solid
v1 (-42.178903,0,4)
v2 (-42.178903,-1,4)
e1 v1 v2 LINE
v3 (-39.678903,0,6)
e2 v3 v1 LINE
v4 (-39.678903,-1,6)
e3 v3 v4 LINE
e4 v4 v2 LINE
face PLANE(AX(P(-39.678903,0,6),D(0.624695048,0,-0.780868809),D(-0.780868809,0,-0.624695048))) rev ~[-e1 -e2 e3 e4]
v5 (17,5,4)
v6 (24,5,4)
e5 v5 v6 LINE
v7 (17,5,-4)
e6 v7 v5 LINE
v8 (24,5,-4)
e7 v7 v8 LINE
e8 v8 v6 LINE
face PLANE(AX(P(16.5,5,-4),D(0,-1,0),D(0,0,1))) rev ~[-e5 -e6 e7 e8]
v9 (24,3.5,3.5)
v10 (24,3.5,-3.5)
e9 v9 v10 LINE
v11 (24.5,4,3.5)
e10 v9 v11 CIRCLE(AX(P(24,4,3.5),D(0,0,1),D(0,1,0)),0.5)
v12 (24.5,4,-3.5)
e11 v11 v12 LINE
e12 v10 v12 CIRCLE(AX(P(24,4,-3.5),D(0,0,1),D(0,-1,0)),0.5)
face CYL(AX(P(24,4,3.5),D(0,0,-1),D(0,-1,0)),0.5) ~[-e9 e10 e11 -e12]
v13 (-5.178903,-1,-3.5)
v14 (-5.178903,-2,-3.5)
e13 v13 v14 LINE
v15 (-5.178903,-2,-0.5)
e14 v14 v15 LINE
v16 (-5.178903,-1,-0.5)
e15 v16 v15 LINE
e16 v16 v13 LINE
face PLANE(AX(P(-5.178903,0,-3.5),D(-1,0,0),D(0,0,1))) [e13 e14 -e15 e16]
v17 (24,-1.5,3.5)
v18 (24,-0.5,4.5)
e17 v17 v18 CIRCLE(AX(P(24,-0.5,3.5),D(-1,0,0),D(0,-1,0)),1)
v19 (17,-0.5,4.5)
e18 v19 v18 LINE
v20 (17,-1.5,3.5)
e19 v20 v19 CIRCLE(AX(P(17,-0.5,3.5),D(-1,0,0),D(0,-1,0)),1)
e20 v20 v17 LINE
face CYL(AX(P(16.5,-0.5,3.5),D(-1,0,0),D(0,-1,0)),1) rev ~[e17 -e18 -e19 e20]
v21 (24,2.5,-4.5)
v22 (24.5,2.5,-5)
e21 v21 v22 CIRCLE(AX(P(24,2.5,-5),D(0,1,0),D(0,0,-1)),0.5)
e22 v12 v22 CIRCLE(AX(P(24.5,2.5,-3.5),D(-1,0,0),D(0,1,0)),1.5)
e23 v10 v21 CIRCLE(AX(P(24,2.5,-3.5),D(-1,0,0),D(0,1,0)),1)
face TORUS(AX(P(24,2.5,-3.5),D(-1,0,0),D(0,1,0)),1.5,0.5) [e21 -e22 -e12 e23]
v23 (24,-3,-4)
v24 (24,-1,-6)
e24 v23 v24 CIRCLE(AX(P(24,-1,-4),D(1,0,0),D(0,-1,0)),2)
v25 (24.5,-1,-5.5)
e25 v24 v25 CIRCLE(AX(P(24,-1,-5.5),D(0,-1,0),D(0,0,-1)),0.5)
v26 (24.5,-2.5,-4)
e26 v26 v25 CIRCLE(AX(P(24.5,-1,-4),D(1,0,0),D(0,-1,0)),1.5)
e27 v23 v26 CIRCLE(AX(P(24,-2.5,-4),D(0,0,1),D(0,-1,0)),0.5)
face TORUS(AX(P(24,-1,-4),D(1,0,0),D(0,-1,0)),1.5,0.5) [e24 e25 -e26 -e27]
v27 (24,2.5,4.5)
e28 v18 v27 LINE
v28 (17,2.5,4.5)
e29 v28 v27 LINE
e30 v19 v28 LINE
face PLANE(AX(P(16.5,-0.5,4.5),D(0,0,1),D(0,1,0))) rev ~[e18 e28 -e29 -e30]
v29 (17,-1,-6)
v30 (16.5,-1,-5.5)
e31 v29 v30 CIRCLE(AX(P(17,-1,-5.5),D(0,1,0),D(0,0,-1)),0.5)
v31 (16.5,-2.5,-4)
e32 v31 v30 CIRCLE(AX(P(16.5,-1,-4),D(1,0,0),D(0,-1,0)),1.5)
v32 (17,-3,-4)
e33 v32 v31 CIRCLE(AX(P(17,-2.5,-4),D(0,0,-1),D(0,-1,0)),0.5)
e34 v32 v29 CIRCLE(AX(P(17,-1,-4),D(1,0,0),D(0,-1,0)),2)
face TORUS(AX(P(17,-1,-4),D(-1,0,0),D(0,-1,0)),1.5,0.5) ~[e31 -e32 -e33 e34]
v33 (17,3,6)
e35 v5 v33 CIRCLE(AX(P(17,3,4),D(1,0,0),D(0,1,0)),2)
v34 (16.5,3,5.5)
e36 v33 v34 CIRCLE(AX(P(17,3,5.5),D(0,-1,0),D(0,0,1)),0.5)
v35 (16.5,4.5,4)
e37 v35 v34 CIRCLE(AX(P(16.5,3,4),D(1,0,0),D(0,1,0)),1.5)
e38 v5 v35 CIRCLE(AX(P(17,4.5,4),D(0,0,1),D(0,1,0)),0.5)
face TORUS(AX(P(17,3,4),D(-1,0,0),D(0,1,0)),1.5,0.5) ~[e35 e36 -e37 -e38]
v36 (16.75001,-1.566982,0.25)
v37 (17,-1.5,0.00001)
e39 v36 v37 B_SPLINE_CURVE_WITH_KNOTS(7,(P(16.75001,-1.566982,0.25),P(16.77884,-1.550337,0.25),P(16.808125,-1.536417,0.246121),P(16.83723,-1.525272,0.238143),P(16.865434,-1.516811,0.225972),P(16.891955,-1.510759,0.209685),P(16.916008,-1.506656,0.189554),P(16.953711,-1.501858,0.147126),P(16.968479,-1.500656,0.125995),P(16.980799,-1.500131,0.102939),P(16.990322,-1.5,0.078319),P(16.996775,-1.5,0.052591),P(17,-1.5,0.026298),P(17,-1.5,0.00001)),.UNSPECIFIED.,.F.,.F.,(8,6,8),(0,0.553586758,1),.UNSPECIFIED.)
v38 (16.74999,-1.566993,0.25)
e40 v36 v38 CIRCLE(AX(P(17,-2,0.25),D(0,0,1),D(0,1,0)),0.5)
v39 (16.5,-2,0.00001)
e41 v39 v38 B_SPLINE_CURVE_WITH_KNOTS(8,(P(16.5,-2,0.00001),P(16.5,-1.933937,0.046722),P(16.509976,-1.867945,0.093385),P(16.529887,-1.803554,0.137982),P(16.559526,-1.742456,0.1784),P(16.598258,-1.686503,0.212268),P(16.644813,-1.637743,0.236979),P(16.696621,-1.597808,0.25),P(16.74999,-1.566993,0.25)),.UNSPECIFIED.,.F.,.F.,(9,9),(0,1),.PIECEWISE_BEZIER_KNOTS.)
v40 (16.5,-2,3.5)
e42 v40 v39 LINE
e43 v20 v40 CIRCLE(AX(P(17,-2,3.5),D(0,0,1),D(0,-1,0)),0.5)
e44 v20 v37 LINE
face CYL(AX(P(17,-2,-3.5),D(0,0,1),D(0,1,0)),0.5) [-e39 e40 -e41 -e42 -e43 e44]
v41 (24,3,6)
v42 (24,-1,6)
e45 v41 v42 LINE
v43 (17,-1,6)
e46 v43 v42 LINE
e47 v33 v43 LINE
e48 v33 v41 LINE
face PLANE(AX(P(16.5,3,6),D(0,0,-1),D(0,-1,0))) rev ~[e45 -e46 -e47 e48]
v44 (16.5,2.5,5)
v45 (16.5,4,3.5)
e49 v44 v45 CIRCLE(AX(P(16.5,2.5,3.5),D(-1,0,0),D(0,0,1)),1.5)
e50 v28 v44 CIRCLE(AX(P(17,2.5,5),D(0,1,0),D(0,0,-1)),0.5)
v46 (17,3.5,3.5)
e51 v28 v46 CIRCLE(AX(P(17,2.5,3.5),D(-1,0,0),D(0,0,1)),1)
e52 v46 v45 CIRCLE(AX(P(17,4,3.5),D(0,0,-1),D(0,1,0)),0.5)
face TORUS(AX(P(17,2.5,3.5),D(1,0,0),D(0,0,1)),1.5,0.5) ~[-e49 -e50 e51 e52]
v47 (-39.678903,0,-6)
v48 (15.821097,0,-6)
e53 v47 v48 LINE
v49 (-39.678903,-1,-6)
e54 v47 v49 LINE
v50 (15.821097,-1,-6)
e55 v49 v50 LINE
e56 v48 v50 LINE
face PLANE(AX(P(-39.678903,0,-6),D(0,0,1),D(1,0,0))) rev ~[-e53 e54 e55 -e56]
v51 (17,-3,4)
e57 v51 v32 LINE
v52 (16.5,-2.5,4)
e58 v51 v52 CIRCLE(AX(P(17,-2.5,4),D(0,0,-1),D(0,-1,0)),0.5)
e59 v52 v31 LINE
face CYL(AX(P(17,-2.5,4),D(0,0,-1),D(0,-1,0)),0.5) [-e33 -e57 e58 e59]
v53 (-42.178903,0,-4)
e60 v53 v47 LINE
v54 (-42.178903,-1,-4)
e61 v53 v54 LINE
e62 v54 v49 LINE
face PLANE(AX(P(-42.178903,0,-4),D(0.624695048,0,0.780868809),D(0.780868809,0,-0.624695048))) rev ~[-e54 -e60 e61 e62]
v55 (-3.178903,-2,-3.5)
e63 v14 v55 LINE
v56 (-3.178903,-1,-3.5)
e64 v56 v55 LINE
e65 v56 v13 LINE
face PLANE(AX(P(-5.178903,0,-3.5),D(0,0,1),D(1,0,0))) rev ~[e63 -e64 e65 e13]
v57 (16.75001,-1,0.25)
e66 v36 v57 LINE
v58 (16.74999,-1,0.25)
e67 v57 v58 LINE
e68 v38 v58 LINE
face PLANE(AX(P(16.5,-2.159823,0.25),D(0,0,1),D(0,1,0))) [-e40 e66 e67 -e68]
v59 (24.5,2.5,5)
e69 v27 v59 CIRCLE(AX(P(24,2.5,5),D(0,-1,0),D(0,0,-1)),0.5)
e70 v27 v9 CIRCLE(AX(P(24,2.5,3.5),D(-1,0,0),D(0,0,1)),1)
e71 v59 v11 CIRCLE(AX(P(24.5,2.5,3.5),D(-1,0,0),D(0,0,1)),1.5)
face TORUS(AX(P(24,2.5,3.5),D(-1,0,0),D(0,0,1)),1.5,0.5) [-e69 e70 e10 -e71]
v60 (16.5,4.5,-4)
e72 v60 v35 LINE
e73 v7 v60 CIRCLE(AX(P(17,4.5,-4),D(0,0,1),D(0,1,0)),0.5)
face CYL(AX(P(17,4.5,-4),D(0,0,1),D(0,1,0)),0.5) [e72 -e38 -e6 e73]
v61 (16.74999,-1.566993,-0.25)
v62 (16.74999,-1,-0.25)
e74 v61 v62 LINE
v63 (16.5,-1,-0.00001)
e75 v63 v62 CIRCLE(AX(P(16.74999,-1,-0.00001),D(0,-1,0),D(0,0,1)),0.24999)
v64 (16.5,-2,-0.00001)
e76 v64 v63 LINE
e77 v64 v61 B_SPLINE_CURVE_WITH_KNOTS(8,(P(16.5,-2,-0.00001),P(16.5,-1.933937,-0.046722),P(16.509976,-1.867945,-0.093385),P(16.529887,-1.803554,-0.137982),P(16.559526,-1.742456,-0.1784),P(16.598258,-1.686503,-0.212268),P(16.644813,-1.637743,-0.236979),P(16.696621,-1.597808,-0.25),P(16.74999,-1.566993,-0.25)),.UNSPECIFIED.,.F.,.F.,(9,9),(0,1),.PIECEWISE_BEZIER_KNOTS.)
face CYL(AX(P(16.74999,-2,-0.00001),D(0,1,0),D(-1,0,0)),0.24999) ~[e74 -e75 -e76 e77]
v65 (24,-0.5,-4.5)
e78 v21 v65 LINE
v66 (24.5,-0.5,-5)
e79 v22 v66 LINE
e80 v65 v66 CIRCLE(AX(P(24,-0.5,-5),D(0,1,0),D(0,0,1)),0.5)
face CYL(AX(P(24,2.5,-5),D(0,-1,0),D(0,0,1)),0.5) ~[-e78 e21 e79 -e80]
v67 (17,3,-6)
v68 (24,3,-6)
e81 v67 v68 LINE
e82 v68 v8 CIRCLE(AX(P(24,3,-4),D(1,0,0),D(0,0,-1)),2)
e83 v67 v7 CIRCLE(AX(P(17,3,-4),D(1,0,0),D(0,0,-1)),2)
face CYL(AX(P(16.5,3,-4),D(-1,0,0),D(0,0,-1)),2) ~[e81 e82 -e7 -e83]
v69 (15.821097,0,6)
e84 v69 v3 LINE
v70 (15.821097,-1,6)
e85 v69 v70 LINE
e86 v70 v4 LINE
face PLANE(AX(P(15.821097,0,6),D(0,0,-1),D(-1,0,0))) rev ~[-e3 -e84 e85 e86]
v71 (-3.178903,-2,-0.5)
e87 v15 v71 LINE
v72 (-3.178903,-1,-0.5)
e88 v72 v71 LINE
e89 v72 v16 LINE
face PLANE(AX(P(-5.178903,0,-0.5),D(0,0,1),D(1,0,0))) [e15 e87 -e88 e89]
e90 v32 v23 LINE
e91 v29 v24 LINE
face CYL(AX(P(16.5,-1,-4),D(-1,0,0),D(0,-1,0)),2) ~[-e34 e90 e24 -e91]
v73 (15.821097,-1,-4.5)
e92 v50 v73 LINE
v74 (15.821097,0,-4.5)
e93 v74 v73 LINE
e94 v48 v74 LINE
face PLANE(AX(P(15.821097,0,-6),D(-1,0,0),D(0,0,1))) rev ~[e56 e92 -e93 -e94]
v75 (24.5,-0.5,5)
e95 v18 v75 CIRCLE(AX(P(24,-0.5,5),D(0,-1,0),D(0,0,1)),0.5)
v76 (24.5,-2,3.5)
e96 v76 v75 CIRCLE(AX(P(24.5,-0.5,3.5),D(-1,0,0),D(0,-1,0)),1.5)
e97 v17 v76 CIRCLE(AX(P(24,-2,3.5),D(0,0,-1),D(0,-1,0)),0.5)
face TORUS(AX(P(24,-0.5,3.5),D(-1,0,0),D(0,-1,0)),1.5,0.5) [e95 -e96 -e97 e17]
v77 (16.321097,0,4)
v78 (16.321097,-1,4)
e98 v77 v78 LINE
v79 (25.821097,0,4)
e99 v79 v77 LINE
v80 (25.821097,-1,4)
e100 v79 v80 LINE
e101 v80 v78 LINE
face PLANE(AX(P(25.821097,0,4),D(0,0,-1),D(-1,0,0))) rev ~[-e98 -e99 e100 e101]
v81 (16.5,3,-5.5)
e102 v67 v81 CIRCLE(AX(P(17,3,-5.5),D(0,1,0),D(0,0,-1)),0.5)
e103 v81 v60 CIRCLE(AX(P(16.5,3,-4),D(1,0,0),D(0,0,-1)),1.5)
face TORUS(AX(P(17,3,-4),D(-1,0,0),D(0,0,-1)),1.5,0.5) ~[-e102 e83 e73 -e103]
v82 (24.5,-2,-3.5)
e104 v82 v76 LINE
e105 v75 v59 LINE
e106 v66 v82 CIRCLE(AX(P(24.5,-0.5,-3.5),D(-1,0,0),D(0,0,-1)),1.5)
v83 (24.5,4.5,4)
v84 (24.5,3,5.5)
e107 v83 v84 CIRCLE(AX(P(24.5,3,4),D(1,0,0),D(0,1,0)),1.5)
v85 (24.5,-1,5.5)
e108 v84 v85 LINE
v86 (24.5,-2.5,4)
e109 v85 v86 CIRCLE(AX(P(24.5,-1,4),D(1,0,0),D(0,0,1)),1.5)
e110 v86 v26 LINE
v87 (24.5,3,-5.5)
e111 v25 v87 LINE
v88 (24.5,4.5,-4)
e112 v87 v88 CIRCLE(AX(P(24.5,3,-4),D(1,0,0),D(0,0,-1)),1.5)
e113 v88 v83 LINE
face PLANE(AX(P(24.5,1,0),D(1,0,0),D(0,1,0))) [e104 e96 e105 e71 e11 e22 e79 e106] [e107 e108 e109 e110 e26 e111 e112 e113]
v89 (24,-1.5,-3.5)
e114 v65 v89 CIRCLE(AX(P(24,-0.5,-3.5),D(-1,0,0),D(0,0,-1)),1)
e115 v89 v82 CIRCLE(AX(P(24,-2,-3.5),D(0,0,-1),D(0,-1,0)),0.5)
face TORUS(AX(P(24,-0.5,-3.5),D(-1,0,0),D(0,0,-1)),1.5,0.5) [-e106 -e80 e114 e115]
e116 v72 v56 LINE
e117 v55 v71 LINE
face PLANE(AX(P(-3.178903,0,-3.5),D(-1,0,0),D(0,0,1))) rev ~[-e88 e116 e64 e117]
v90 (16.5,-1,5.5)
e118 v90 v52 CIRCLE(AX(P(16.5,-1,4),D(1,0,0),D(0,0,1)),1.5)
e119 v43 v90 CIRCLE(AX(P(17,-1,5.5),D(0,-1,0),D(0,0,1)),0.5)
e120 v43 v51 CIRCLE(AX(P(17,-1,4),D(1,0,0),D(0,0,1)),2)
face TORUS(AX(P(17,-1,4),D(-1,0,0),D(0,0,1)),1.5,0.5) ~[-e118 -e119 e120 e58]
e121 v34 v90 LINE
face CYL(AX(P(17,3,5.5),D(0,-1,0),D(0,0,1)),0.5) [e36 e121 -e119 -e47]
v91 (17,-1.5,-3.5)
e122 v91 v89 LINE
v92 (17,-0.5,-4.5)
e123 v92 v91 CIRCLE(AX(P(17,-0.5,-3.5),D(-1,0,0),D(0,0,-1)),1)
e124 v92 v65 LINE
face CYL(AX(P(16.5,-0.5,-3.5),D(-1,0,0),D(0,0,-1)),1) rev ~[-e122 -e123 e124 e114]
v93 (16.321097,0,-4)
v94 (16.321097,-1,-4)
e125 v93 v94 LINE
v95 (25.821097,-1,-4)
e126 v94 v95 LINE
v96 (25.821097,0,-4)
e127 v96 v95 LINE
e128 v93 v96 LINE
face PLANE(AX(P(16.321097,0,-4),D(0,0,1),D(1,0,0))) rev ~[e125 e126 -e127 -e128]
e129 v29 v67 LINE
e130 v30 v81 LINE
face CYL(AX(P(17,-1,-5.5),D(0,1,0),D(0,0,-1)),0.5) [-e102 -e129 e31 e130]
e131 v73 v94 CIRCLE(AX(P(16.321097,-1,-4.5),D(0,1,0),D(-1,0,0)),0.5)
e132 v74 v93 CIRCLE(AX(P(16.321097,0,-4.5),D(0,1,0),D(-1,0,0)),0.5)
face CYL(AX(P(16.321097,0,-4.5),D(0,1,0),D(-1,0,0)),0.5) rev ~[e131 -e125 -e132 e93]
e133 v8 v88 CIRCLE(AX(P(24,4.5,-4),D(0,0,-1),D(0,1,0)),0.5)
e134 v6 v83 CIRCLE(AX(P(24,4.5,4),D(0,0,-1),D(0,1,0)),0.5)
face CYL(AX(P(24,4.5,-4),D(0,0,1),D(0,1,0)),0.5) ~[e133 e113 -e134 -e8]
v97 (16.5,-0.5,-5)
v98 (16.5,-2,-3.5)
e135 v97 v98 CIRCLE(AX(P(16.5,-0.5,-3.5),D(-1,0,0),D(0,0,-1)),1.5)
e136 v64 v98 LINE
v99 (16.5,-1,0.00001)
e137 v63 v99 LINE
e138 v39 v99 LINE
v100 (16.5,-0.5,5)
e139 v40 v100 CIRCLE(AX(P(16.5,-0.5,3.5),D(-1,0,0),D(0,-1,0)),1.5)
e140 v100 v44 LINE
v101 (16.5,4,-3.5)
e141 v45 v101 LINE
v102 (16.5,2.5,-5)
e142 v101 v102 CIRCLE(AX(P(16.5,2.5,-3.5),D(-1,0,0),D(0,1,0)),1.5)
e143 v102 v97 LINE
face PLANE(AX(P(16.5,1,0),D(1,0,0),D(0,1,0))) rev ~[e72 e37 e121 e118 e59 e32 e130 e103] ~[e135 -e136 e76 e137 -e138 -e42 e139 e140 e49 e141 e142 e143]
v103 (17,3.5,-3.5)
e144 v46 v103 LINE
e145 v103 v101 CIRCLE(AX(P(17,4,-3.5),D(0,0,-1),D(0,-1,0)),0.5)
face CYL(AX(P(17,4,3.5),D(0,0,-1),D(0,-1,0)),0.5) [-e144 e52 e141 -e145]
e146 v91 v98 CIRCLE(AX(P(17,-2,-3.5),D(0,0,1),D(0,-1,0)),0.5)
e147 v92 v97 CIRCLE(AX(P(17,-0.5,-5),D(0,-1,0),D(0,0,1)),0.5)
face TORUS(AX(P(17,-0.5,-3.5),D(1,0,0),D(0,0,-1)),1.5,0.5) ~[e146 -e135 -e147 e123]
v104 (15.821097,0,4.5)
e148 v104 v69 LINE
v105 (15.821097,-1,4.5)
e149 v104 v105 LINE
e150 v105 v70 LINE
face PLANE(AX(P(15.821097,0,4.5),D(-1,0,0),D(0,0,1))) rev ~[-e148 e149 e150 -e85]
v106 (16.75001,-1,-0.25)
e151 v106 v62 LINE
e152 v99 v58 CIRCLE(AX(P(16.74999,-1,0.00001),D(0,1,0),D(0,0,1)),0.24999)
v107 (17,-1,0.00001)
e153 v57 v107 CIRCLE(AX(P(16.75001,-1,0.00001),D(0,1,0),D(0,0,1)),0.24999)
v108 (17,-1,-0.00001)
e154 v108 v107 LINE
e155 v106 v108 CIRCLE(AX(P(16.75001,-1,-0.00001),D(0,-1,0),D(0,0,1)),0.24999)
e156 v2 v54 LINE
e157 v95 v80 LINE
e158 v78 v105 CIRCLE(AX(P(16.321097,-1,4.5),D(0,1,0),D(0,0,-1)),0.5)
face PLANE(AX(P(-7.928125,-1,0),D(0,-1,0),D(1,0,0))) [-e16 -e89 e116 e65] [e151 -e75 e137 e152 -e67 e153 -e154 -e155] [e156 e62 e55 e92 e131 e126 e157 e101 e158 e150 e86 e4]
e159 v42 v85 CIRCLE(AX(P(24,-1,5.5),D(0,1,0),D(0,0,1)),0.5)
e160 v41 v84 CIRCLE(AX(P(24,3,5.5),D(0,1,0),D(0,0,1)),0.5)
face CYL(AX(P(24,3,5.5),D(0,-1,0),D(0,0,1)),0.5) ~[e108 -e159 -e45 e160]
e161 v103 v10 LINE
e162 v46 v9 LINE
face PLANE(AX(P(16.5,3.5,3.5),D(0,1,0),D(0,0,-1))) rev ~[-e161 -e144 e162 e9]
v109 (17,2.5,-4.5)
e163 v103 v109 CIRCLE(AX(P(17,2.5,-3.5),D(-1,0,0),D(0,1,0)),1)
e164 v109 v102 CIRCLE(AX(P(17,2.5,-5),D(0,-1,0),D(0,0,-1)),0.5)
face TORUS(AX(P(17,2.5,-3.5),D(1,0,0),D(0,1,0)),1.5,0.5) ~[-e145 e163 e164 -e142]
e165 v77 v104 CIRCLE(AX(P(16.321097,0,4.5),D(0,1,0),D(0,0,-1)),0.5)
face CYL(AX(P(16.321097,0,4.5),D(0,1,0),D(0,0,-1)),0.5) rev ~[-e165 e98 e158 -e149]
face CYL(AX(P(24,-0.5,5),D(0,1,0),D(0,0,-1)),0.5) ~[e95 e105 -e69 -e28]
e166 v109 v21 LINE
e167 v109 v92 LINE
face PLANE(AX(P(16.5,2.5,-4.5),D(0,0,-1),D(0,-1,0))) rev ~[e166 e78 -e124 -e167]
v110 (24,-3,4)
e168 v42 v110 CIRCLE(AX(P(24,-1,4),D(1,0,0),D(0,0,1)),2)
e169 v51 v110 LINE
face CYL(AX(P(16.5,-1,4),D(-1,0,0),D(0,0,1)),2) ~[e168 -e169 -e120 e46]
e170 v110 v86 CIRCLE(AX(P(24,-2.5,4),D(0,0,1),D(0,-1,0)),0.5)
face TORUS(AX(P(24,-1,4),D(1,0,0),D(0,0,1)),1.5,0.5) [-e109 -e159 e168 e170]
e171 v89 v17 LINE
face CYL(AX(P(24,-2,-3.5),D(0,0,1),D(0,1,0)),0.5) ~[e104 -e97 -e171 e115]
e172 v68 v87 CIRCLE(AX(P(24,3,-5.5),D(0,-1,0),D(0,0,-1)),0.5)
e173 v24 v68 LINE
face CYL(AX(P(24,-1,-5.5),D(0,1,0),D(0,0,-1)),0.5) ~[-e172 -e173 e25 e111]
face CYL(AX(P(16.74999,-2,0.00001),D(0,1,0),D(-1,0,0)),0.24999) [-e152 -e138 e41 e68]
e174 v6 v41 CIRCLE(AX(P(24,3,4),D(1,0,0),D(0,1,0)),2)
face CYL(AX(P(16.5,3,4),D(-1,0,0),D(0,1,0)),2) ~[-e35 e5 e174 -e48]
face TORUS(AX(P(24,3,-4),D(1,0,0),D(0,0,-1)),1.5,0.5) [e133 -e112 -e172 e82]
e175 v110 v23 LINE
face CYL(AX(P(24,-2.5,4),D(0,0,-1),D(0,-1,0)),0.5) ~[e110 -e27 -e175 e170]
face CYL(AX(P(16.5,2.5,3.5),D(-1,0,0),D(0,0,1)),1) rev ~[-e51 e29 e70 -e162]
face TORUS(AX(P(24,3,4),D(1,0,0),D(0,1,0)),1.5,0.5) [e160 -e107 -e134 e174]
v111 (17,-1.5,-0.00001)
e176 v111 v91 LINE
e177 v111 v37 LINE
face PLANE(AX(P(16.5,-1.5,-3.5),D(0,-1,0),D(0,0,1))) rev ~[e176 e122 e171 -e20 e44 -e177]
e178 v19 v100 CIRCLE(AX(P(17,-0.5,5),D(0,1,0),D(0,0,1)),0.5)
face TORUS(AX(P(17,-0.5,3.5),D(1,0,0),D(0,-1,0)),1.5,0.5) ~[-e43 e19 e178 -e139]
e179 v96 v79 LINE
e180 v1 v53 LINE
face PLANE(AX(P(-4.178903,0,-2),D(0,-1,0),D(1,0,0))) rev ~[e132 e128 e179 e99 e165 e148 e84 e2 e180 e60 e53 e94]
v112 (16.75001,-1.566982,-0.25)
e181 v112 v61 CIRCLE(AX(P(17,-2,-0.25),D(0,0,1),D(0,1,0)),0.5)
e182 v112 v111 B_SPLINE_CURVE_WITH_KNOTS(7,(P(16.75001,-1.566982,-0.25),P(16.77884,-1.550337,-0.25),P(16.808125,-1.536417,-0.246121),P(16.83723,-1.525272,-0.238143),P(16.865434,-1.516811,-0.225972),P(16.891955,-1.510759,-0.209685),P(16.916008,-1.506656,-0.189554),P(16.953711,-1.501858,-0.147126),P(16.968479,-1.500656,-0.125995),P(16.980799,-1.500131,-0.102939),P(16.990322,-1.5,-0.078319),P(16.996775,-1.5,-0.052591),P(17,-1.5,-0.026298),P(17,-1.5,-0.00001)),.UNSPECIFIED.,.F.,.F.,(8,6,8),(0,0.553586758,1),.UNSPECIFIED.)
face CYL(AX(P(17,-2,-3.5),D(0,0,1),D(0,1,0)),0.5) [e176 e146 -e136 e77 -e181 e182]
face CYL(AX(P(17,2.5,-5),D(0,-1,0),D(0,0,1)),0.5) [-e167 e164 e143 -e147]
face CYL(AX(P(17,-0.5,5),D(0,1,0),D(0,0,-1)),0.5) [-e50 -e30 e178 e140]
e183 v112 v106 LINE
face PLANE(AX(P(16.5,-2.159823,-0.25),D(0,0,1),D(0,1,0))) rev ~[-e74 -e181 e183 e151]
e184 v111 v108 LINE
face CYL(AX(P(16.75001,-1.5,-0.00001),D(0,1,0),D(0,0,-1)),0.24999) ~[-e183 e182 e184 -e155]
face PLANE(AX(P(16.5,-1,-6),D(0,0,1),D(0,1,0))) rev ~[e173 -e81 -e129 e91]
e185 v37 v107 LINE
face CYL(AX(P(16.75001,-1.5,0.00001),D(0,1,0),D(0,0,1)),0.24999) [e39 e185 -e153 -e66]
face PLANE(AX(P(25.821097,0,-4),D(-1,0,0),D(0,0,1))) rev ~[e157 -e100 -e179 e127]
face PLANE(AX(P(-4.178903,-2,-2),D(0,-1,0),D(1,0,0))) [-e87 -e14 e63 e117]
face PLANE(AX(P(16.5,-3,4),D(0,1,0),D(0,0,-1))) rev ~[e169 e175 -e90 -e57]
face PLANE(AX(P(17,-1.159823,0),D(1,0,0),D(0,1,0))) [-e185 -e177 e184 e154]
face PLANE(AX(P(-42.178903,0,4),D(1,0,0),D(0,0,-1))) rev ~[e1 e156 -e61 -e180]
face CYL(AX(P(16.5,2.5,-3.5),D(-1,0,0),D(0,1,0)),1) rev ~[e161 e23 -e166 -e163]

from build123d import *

# Parameters (mm, degrees)
F1_DEPTH  = 1
F4_DEPTH  = 8
F5_R      = 0.5
F6_W      = 2
F6_H      = 0.5
F7_DEPTH  = 0.5
F8_R      = 0.24999
F9_W      = 2
F9_H      = 3
F10_DEPTH = 2


# Not quite as in the source:
# - a fillet or chamfer is up to 0.001 mm smaller than in the source, because OpenCascade refuses the exact size


with BuildPart() as f1:
    # F0 (on Front) → F1 (new body)
    with BuildSketch(Plane.XZ):
        with BuildLine():
            Line((-42.178902775, 4), (-42.178902775, 0))
            Line((-42.178902775, 0), (-42.178902775, -4))
            Line((-42.178902775, -4), (-39.678902775, -6))
            Line((-39.678902775, -6), (15.821097225, -6))
            Line((15.821097225, -6), (15.821097225, -4.5))
            ThreePointArc((15.821097225, -4.5), (15.9675438344, -4.1464466094), (16.321097225, -4))
            Line((16.321097225, -4), (25.821097225, -4))
            Line((25.821097225, -4), (25.821097225, 0))
            Line((25.821097225, 0), (25.821097225, 4))
            Line((25.821097225, 4), (16.321097225, 4))
            ThreePointArc((16.321097225, 4), (15.9675438344, 4.1464466094), (15.821097225, 4.5))
            Line((15.821097225, 4.5), (15.821097225, 6))
            Line((15.821097225, 6), (-39.678902775, 6))
            Line((-39.678902775, 6), (-42.178902775, 4))
        make_face()
    extrude(amount=F1_DEPTH)



with BuildPart() as f4:
    # F3 (on offset) → F4 (new body)
    with BuildSketch(Plane.YZ.offset(16.5)):
        with BuildLine():
            Line((-1, -6), (3, -6))
            ThreePointArc((3, -6), (4.4142135624, -5.4142135624), (5, -4))
            Line((5, -4), (5, 4))
            ThreePointArc((5, 4), (4.4142135624, 5.4142135624), (3, 6))
            Line((3, 6), (-1, 6))
            ThreePointArc((-1, 6), (-2.4142135624, 5.4142135624), (-3, 4))
            Line((-3, 4), (-3, -4))
            ThreePointArc((-3, -4), (-2.4142135624, -5.4142135624), (-1, -6))
        make_face()
        with BuildLine():
            ThreePointArc((3.5, -3.5), (3.2071067812, -4.2071067812), (2.5, -4.5))
            Line((2.5, -4.5), (-0.5, -4.5))
            ThreePointArc((-0.5, -4.5), (-1.2071067812, -4.2071067812), (-1.5, -3.5))
            Line((-1.5, -3.5), (-1.5, 3.5))
            ThreePointArc((-1.5, 3.5), (-1.2071067812, 4.2071067812), (-0.5, 4.5))
            Line((-0.5, 4.5), (2.5, 4.5))
            ThreePointArc((2.5, 4.5), (3.2071067812, 4.2071067812), (3.5, 3.5))
            Line((3.5, 3.5), (3.5, -3.5))
        make_face(mode=Mode.SUBTRACT)
    extrude(amount=F4_DEPTH)

    # F5
    f5_edges = [f4.edges().sort_by_distance(p)[0] for p in [
        (24.5, -2.414214, 5.414214),
        (24.5, -1.207107, 4.207107),
        (16.5, -1.207107, 4.207107),
        (16.5, -2.414214, 5.414214),
    ]]
    fillet(f5_edges, radius=F5_R)


with BuildPart() as f1_1:
    add(f1.part)

    add(f4.part)  # F7 merges F4
    # F6 (on offset) → F7 (join)
    with BuildSketch(Plane.YZ.offset(16.5)):
        with Locations((-1.159823034, 0)):
            Rectangle(F6_W, F6_H)
    extrude(amount=F7_DEPTH)

    # F8 (radius 0.25 in the source; OpenCascade refuses exactly that, so slightly less here)
    f8_edges = [f1_1.edges().sort_by_distance(p)[0] for p in [
        (17, -1.25, 0.25),
        (17, -1.25, -0.25),
        (16.5, -1.5, -0.25),
        (16.5, -1.5, 0.25),
    ]]
    fillet(f8_edges, radius=F8_R)

    # F9 (on Front) → F10 (join)
    with BuildSketch(Plane.XZ):
        with Locations((-4.178902775, -2)):
            Rectangle(F9_W, F9_H)
    extrude(amount=F10_DEPTH)


solid = f1_1.part
